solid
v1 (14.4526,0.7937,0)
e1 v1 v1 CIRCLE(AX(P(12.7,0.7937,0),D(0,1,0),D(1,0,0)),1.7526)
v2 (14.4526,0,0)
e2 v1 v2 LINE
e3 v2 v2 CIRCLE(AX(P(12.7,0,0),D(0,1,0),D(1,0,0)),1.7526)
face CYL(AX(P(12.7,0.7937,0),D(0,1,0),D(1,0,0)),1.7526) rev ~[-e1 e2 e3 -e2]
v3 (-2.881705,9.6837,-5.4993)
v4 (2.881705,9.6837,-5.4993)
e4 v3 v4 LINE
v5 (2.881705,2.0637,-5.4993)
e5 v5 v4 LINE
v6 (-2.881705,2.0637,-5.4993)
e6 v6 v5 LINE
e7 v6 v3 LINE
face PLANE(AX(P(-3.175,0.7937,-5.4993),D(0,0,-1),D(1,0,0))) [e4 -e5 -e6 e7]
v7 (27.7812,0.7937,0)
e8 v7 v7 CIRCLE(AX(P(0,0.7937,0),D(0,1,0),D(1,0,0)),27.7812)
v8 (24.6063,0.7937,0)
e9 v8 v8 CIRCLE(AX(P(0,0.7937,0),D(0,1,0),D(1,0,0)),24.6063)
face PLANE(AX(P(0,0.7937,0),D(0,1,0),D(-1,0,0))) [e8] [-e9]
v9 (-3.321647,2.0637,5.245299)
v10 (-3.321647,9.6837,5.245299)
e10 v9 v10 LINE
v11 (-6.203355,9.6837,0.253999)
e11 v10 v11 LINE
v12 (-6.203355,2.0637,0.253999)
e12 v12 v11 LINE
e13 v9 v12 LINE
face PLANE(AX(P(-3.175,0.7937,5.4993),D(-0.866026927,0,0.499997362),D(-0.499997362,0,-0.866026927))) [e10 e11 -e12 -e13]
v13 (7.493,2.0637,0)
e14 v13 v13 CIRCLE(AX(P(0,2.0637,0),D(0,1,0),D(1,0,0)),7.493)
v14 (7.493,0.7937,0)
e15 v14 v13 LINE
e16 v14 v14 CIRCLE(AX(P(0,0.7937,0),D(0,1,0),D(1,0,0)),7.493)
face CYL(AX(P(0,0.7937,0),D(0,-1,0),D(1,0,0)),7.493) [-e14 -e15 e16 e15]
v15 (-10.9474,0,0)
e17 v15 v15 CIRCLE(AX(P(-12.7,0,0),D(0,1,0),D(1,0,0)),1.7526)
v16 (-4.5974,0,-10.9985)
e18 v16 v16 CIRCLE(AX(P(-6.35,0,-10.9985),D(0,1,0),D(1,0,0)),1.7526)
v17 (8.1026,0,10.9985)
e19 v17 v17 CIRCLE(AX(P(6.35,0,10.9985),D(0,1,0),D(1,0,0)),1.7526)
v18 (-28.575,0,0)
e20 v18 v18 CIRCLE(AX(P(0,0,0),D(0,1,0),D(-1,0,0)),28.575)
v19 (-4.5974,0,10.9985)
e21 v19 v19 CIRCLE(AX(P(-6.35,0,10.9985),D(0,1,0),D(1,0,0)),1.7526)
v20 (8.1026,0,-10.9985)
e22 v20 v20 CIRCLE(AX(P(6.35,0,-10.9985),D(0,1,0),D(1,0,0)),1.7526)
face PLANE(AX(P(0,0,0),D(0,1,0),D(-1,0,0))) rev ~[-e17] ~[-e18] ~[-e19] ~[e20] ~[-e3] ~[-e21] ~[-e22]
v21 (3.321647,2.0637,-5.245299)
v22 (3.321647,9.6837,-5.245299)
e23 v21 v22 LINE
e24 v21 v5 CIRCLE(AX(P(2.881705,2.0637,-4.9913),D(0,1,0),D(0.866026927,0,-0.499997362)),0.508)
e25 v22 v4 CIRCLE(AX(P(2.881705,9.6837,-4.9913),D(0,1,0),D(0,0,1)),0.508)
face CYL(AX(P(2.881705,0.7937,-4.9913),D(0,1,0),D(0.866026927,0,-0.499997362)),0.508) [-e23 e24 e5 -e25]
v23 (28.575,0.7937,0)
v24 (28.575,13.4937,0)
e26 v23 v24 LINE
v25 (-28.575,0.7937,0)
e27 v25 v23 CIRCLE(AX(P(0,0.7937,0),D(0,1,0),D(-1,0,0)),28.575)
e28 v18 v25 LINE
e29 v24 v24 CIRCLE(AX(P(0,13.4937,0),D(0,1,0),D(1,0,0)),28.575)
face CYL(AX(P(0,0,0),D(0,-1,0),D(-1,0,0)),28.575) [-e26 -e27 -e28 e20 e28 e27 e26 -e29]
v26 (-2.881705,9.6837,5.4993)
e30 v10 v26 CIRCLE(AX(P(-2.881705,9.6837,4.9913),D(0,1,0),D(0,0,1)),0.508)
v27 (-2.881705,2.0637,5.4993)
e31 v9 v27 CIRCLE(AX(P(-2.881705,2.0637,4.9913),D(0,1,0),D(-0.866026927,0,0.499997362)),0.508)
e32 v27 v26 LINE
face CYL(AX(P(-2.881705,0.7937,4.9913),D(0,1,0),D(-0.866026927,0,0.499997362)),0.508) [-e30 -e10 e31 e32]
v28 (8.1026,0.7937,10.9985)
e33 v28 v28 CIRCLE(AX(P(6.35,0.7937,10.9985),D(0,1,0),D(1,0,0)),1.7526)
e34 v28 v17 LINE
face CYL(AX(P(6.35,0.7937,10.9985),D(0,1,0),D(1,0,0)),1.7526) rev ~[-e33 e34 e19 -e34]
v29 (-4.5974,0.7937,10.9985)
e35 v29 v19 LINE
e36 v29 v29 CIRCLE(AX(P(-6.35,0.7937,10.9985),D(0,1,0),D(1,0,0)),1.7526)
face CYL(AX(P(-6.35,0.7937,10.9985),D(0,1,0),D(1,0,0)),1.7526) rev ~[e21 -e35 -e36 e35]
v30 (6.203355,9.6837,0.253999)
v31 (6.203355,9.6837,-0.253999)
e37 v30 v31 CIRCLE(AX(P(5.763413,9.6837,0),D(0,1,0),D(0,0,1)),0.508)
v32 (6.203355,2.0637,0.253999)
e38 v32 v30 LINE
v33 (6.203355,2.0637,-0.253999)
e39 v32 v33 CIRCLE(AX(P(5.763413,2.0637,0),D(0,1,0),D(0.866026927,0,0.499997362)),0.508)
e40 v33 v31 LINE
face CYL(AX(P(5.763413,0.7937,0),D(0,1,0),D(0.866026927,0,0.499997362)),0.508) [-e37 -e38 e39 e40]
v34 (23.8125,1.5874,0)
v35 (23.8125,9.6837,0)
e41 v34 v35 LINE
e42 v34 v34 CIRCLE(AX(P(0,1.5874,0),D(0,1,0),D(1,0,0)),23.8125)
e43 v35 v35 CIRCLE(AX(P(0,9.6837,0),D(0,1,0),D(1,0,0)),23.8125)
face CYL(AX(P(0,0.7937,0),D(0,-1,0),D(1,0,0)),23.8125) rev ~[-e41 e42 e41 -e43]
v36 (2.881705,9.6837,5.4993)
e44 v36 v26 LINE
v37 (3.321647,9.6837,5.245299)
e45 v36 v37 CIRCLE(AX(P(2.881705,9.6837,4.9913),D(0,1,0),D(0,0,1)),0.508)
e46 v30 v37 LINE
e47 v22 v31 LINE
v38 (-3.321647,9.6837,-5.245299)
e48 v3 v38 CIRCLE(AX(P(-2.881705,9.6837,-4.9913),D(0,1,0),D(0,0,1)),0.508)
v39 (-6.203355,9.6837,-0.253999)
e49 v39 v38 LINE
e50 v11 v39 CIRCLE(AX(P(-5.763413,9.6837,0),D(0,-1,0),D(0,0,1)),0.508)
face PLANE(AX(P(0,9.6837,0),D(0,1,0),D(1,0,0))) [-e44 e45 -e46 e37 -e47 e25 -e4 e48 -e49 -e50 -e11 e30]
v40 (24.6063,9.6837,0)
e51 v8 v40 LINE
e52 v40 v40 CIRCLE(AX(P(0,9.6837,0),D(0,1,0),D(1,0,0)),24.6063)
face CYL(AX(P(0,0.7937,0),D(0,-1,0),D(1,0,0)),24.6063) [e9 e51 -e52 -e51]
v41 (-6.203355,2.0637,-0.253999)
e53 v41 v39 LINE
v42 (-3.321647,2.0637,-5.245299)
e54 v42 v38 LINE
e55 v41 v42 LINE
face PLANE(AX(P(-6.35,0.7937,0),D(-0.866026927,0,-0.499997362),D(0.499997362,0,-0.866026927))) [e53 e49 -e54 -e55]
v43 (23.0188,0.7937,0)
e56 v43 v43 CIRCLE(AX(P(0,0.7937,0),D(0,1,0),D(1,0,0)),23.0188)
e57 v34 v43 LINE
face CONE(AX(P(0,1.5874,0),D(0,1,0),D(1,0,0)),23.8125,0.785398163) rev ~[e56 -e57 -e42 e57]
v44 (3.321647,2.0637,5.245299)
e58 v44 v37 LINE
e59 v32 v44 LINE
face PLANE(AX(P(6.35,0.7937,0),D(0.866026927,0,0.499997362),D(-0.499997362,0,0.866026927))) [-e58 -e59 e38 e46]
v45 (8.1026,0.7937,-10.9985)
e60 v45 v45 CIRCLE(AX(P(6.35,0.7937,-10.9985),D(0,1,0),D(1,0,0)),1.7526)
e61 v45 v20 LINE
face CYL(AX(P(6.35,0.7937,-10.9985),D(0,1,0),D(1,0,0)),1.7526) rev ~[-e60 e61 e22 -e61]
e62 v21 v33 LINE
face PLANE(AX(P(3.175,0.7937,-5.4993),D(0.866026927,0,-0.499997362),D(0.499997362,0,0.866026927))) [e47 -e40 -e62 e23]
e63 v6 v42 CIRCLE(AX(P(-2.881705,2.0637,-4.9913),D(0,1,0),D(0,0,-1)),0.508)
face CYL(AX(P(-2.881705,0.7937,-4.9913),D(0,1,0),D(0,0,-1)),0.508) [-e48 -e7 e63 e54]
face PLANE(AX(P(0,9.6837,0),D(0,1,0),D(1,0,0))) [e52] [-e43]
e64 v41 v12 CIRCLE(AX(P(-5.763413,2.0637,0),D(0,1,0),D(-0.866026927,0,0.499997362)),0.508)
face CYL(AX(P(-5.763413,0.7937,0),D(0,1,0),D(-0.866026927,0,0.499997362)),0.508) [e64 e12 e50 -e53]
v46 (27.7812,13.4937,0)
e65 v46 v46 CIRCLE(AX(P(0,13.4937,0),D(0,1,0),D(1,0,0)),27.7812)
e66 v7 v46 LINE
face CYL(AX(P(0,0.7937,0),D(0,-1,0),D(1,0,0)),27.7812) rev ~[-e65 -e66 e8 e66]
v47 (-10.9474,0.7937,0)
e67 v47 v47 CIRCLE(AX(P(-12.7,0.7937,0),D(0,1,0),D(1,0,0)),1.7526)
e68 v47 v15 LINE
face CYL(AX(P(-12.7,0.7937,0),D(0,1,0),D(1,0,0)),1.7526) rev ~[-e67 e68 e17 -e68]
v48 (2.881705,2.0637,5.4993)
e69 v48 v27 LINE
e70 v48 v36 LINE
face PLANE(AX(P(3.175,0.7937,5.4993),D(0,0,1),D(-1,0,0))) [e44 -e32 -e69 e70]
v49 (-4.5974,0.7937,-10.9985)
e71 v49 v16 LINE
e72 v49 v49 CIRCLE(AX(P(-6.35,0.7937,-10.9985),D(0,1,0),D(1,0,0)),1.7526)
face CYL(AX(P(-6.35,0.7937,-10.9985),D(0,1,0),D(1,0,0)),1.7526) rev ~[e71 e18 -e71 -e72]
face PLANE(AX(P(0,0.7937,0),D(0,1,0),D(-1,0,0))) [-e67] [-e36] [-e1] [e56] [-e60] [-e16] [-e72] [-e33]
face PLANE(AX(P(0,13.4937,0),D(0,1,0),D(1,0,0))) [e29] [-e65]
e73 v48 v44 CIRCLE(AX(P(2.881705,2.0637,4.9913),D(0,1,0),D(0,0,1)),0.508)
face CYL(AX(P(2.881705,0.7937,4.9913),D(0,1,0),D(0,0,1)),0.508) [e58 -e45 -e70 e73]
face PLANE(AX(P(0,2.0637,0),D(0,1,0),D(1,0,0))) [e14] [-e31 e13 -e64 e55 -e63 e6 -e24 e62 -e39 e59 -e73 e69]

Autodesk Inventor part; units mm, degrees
ref_plane "YZ Plane" through (0, 0, 0) normal (1, 0, 0) x (0, 1, 0)
ref_plane "XZ Plane" through (0, 0, 0) normal (0, 1, 0) x (-1, 0, 0)
ref_plane "XY Plane" through (0, 0, 0) normal (0, 0, 1) x (1, 0, 0)
sketch "Sketch1" plane through (0, 0, 0) normal (0, 1, 0) x (-1, 0, 0)
  circle A0 centre (0, 0) radius 28.575
  dimension "d0" = 57.15
extrude "Extrusion1" add sketch "Sketch1" along normal blind 0.7937
sketch "Sketch2" plane through (0, 0.7937, 0) normal (0, 1, 0) x (1, 0, 0)
  line L0 (0, 0) -> (-28.575, 0) construction
  circle A0 centre (0, 0) radius 28.575 projected
  line L1 (-6.35, 0) -> (-3.175, 5.4993)
  line L2 (-3.175, 5.4993) -> (3.175, 5.4993)
  line L3 (3.175, 5.4993) -> (6.35, 0)
  line L4 (6.35, 0) -> (3.175, -5.4993)
  line L5 (3.175, -5.4993) -> (-3.175, -5.4993)
  line L6 (-3.175, -5.4993) -> (-6.35, 0)
  circle A1 centre (0, 0) radius 23.8125
  circle A2 centre (0, 0) radius 24.6063
  circle A3 centre (0, 0) radius 27.7812
  circle A4 centre (0, 0) radius 7.493
  circle A5 centre (0, 0) radius 12.7 construction
  circle A6 centre (-12.7, 0) radius 1.7526
  circle A7 centre (-6.35, -10.9985) radius 1.7526
  circle A8 centre (6.35, -10.9985) radius 1.7526
  circle A9 centre (12.7, 0) radius 1.7526
  circle A10 centre (6.35, 10.9985) radius 1.7526
  circle A11 centre (-6.35, 10.9985) radius 1.7526
  dimension "d18" = 25.4
  dimension "d3" = 6.35
  dimension "d4" = 47.625
  dimension "d5" = 0.7937
  dimension "d6" = 0.7937
  dimension "d15" = 14.986
  dimension "d19" = 3.5052
  dimension "d22" = 360
extrude "Extrusion2" add sketch "Sketch2" along normal blind 8.89 contours L1 L2 L3 L4 L5 L6 | A2
fillet "Fillet1" radius 0.508 6 edges at (6.35, 5.2387, 0) (3.175, 5.2387, -5.4993) (-3.175, 5.2387, -5.4993) (-6.35, 5.2387, 0) (-3.175, 5.2387, 5.4993) (3.175, 5.2387, 5.4993)
extrude "Extrusion3" add sketch "Sketch2" along normal blind 12.7 contours A0
chamfer "Chamfer1" distance 0.7937 angle 45 1 edges at (-23.8125, 0.7937, 0)
extrude "Extrusion4" add sketch "Sketch2" along normal blind 1.27 contours L1 L2 L3 L4 L5 L6 | A4
extrude "Extrusion5" cut sketch "Sketch2" against normal through all contours A6 | A7 | A8 | A9 | A10 | A11
properties part number "Wheel V2 Mold"
